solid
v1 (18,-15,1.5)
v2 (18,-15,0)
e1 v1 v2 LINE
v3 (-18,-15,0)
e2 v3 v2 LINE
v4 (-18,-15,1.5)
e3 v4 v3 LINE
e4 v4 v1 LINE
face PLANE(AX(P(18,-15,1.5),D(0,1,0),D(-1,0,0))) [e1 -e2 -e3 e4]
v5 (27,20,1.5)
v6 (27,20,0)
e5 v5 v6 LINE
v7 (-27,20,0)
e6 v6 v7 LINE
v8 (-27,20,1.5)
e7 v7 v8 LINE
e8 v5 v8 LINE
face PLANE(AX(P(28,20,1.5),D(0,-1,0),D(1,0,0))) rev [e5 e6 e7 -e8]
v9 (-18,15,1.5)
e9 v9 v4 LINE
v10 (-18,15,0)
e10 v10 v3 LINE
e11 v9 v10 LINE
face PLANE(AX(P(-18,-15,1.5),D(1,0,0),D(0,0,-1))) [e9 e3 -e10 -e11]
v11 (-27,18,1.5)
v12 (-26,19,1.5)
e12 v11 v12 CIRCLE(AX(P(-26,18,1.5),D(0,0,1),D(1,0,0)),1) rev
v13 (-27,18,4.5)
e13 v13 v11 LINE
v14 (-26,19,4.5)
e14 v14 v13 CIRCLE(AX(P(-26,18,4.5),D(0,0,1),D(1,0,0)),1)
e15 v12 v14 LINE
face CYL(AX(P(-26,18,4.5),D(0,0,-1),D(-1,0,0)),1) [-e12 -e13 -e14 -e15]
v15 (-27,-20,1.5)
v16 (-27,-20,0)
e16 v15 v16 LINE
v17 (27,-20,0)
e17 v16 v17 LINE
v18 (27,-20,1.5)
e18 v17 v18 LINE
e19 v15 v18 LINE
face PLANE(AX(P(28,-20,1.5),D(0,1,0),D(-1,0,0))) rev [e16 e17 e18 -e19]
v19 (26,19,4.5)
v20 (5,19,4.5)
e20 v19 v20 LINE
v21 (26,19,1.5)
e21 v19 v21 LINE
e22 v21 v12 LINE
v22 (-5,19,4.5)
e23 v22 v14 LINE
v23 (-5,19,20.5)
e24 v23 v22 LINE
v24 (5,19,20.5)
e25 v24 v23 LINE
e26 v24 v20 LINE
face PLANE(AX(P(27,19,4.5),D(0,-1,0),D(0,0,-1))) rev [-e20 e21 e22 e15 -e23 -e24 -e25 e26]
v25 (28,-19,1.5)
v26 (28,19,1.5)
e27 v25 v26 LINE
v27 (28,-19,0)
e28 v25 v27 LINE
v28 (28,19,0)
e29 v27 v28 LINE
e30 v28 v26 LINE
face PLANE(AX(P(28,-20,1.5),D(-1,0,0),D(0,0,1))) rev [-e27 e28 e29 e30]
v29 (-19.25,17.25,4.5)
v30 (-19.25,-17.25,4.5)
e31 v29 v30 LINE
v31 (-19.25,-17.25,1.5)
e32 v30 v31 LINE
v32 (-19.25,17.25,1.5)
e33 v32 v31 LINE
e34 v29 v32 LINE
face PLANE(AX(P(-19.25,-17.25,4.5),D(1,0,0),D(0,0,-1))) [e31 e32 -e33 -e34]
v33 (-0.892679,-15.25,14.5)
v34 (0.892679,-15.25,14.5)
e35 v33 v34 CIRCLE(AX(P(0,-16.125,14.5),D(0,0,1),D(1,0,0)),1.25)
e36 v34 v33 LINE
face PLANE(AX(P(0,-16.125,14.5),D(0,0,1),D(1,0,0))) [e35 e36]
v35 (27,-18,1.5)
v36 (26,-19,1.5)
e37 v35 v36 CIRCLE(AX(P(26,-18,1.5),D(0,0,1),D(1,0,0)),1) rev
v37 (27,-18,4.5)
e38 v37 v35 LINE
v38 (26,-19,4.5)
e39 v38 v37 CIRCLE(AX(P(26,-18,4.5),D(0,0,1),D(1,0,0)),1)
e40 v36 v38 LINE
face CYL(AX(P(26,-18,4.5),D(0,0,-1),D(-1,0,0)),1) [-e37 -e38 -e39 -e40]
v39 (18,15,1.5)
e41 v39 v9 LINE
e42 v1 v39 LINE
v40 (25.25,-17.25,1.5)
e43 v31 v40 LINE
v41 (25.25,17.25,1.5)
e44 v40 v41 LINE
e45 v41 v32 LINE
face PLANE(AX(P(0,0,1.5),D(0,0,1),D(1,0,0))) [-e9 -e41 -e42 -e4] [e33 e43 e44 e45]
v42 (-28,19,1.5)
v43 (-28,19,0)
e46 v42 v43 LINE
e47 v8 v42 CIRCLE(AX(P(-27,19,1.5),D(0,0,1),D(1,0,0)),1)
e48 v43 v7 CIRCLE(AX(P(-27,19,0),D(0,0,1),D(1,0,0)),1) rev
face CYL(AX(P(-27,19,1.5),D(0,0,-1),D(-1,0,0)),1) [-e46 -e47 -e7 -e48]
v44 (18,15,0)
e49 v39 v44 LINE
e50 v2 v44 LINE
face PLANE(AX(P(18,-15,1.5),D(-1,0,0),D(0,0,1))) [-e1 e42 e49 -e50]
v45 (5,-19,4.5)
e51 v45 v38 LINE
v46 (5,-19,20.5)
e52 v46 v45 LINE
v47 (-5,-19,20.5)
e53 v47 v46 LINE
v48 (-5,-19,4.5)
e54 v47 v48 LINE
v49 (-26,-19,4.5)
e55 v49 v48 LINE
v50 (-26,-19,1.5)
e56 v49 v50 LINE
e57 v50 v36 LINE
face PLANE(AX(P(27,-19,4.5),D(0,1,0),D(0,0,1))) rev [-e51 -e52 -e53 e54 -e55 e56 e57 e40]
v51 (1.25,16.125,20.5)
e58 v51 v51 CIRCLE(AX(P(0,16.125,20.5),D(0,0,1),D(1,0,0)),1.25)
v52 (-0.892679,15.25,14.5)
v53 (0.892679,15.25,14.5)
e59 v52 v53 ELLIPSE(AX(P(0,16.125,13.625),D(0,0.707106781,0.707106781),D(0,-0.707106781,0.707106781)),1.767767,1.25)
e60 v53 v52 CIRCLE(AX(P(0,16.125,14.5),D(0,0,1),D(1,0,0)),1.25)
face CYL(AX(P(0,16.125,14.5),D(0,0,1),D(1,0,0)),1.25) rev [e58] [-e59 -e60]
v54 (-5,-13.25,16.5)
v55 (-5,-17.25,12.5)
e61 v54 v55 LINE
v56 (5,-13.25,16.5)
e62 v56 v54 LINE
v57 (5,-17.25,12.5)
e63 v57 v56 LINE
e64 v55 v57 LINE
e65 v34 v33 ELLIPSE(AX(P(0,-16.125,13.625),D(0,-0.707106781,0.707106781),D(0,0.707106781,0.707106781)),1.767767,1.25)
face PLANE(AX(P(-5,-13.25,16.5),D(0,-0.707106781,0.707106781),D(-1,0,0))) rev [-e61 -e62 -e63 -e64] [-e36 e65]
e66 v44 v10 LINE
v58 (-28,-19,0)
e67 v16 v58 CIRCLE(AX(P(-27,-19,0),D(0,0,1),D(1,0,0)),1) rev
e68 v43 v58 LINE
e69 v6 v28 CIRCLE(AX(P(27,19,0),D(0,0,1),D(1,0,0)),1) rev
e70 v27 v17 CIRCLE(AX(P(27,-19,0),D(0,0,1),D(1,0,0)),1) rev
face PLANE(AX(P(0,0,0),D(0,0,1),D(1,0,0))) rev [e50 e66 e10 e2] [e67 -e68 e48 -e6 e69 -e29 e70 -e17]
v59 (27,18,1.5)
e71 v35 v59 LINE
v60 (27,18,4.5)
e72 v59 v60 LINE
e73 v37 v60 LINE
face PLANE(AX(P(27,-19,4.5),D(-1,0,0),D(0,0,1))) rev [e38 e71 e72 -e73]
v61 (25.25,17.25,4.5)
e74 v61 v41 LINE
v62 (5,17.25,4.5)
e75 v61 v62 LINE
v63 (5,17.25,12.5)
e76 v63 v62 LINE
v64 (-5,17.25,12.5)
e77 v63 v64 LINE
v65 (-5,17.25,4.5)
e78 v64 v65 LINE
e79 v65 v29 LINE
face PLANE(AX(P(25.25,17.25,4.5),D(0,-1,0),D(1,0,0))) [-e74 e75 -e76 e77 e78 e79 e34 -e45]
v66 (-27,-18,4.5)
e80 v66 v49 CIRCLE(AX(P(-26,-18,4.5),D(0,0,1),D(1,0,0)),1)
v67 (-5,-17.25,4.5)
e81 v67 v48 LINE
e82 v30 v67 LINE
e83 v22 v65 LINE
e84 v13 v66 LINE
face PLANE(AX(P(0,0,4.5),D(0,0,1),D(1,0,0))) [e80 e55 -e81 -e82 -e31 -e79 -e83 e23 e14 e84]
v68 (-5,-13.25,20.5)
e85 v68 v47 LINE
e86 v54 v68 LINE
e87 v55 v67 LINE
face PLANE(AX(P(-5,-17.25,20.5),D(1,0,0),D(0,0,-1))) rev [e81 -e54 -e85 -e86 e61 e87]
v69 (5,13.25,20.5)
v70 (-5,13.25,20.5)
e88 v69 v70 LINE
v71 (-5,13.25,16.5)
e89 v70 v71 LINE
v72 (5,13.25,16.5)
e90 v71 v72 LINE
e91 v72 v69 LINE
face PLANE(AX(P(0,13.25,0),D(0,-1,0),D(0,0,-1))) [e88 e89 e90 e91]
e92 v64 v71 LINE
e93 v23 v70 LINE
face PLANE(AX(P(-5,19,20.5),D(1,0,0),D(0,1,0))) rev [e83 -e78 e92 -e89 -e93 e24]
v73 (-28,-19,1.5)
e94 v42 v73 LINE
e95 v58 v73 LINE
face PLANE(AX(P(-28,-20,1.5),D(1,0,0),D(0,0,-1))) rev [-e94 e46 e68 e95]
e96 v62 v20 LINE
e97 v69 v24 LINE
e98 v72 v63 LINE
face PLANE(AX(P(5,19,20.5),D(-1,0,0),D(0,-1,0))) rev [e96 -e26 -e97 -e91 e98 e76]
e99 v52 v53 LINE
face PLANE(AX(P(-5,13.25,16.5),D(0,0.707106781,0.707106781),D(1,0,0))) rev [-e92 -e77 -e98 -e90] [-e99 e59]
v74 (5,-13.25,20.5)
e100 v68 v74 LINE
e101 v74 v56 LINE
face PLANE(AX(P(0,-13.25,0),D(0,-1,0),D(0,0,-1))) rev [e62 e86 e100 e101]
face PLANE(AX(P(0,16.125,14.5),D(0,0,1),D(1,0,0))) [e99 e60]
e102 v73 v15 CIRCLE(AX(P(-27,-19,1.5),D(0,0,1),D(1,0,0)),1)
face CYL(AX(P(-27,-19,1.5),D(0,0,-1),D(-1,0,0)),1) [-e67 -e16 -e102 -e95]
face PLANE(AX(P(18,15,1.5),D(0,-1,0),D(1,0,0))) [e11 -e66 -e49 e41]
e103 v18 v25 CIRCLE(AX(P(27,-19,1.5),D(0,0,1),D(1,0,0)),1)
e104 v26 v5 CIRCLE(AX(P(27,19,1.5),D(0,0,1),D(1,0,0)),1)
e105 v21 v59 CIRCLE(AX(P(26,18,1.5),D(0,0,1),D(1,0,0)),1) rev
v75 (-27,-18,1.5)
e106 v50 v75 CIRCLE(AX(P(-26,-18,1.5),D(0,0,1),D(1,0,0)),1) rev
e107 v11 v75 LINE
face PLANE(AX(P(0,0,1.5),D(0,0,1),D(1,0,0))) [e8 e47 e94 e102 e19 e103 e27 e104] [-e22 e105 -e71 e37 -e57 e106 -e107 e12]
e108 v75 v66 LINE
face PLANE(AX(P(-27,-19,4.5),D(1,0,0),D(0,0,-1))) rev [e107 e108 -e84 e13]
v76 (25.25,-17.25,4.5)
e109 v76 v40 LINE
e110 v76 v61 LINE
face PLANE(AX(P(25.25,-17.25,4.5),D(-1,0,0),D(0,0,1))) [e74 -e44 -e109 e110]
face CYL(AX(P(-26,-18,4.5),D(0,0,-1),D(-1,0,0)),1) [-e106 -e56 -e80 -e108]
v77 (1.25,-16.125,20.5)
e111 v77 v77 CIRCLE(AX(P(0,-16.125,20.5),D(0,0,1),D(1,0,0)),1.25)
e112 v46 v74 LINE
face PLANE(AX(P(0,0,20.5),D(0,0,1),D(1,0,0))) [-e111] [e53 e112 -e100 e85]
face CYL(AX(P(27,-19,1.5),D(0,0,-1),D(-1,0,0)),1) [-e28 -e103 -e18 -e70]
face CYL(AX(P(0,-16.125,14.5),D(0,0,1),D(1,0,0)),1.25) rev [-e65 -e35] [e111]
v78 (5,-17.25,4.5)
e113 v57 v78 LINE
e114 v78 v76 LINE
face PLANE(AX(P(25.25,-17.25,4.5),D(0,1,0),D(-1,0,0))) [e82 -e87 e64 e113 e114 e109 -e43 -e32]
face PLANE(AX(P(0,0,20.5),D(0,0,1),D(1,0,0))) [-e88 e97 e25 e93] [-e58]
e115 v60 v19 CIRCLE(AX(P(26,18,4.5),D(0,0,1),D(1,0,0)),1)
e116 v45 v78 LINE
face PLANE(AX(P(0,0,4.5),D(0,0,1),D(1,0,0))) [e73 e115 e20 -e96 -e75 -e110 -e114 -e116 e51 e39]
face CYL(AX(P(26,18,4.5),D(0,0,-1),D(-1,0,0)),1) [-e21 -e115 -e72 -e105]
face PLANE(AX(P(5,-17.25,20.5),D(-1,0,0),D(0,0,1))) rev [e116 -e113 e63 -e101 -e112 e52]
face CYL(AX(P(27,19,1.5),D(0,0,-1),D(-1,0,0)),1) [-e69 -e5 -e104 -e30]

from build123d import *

# Parameters (mm, degrees)
SKETCH1_W           = 56
SKETCH1_H           = 40
SKETCH1_W_2         = 36
SKETCH1_H_2         = 30
BOSS_EXTRUDE1_DEPTH = 1.5
SKETCH2_W           = 54
SKETCH2_H           = 38
SKETCH2_W_2         = 44.5
SKETCH2_H_2         = 34.5
BOSS_EXTRUDE2_DEPTH = 3
SKETCH3_W           = 10
SKETCH3_H           = 1.75
BOSS_EXTRUDE3_DEPTH = 16
SKETCH4_W           = 10
SKETCH4_H           = 4
BOSS_EXTRUDE4_DEPTH = 4
SKETCH6_W           = 10
SKETCH6_H           = 4
BOSS_EXTRUDE5_DEPTH = 4
CHAMFER1_SIZE       = 4
SKETCH7_R           = 1.25
CUT_EXTRUDE2_DEPTH  = 6
FILLET1_R           = 1


with BuildPart() as part:
    # Sketch1 → Boss-Extrude1 (new body)
    with BuildSketch(Plane.XY):
        Rectangle(SKETCH1_W, SKETCH1_H)
        Rectangle(SKETCH1_W_2, SKETCH1_H_2, mode=Mode.SUBTRACT)
    extrude(amount=BOSS_EXTRUDE1_DEPTH)

    # Sketch2 → Boss-Extrude2 (add)
    with BuildSketch(Plane.XY.offset(1.5)):
        Rectangle(SKETCH2_W, SKETCH2_H)
        with Locations((3, 0)):
            Rectangle(SKETCH2_W_2, SKETCH2_H_2, mode=Mode.SUBTRACT)
    extrude(amount=BOSS_EXTRUDE2_DEPTH)

    # Sketch3 → Boss-Extrude3 (add)
    with BuildSketch(Plane.XY.offset(4.5)):
        with Locations((0, 18.125)):
            Rectangle(SKETCH3_W, SKETCH3_H)
        with Locations((0, -18.125)):
            Rectangle(SKETCH3_W, SKETCH3_H)
    extrude(amount=BOSS_EXTRUDE3_DEPTH)

    # Sketch4 → Boss-Extrude4 (add)
    with BuildSketch(Plane(origin=(0, 17.25, 0), x_dir=(-1, 0, 0), z_dir=(0, -1, 0))):
        with Locations((0, -18.5)):
            Rectangle(SKETCH4_W, SKETCH4_H)
    extrude(amount=BOSS_EXTRUDE4_DEPTH)

    # Sketch6 → Boss-Extrude5 (add)
    with BuildSketch(Plane(origin=(0, -17.25, 0), x_dir=(1, 0, 0), z_dir=(0, 1, 0))):
        with Locations((0, -18.5)):
            Rectangle(SKETCH6_W, SKETCH6_H)
    extrude(amount=BOSS_EXTRUDE5_DEPTH)

    # Chamfer1
    chamfer1_edges = [part.edges().sort_by_distance(p)[0] for p in [
        (0, -17.25, 16.5),
        (0, 17.25, 16.5),
    ]]
    chamfer(chamfer1_edges, length=CHAMFER1_SIZE - 0.0001)  # a hair under: the kernel refuses the full size

    # Sketch7 → Cut-Extrude2 (cut)
    with BuildSketch(Plane.XY.offset(20.5)):
        with Locations((0, 16.125)):
            Circle(SKETCH7_R)
        with Locations((0, -16.125)):
            Circle(SKETCH7_R)
    extrude(amount=-CUT_EXTRUDE2_DEPTH, mode=Mode.SUBTRACT)

    # Fillet1
    fillet1_edges = [part.edges().sort_by_distance(p)[0] for p in [
        (-27, 19, 3),
        (-27, -19, 3),
        (27, -19, 3),
        (27, 19, 3),
        (-28, 20, 0.75),
        (28, 20, 0.75),
        (28, -20, 0.75),
        (-28, -20, 0.75),
    ]]
    fillet(fillet1_edges, radius=FILLET1_R)


solid = part.part
